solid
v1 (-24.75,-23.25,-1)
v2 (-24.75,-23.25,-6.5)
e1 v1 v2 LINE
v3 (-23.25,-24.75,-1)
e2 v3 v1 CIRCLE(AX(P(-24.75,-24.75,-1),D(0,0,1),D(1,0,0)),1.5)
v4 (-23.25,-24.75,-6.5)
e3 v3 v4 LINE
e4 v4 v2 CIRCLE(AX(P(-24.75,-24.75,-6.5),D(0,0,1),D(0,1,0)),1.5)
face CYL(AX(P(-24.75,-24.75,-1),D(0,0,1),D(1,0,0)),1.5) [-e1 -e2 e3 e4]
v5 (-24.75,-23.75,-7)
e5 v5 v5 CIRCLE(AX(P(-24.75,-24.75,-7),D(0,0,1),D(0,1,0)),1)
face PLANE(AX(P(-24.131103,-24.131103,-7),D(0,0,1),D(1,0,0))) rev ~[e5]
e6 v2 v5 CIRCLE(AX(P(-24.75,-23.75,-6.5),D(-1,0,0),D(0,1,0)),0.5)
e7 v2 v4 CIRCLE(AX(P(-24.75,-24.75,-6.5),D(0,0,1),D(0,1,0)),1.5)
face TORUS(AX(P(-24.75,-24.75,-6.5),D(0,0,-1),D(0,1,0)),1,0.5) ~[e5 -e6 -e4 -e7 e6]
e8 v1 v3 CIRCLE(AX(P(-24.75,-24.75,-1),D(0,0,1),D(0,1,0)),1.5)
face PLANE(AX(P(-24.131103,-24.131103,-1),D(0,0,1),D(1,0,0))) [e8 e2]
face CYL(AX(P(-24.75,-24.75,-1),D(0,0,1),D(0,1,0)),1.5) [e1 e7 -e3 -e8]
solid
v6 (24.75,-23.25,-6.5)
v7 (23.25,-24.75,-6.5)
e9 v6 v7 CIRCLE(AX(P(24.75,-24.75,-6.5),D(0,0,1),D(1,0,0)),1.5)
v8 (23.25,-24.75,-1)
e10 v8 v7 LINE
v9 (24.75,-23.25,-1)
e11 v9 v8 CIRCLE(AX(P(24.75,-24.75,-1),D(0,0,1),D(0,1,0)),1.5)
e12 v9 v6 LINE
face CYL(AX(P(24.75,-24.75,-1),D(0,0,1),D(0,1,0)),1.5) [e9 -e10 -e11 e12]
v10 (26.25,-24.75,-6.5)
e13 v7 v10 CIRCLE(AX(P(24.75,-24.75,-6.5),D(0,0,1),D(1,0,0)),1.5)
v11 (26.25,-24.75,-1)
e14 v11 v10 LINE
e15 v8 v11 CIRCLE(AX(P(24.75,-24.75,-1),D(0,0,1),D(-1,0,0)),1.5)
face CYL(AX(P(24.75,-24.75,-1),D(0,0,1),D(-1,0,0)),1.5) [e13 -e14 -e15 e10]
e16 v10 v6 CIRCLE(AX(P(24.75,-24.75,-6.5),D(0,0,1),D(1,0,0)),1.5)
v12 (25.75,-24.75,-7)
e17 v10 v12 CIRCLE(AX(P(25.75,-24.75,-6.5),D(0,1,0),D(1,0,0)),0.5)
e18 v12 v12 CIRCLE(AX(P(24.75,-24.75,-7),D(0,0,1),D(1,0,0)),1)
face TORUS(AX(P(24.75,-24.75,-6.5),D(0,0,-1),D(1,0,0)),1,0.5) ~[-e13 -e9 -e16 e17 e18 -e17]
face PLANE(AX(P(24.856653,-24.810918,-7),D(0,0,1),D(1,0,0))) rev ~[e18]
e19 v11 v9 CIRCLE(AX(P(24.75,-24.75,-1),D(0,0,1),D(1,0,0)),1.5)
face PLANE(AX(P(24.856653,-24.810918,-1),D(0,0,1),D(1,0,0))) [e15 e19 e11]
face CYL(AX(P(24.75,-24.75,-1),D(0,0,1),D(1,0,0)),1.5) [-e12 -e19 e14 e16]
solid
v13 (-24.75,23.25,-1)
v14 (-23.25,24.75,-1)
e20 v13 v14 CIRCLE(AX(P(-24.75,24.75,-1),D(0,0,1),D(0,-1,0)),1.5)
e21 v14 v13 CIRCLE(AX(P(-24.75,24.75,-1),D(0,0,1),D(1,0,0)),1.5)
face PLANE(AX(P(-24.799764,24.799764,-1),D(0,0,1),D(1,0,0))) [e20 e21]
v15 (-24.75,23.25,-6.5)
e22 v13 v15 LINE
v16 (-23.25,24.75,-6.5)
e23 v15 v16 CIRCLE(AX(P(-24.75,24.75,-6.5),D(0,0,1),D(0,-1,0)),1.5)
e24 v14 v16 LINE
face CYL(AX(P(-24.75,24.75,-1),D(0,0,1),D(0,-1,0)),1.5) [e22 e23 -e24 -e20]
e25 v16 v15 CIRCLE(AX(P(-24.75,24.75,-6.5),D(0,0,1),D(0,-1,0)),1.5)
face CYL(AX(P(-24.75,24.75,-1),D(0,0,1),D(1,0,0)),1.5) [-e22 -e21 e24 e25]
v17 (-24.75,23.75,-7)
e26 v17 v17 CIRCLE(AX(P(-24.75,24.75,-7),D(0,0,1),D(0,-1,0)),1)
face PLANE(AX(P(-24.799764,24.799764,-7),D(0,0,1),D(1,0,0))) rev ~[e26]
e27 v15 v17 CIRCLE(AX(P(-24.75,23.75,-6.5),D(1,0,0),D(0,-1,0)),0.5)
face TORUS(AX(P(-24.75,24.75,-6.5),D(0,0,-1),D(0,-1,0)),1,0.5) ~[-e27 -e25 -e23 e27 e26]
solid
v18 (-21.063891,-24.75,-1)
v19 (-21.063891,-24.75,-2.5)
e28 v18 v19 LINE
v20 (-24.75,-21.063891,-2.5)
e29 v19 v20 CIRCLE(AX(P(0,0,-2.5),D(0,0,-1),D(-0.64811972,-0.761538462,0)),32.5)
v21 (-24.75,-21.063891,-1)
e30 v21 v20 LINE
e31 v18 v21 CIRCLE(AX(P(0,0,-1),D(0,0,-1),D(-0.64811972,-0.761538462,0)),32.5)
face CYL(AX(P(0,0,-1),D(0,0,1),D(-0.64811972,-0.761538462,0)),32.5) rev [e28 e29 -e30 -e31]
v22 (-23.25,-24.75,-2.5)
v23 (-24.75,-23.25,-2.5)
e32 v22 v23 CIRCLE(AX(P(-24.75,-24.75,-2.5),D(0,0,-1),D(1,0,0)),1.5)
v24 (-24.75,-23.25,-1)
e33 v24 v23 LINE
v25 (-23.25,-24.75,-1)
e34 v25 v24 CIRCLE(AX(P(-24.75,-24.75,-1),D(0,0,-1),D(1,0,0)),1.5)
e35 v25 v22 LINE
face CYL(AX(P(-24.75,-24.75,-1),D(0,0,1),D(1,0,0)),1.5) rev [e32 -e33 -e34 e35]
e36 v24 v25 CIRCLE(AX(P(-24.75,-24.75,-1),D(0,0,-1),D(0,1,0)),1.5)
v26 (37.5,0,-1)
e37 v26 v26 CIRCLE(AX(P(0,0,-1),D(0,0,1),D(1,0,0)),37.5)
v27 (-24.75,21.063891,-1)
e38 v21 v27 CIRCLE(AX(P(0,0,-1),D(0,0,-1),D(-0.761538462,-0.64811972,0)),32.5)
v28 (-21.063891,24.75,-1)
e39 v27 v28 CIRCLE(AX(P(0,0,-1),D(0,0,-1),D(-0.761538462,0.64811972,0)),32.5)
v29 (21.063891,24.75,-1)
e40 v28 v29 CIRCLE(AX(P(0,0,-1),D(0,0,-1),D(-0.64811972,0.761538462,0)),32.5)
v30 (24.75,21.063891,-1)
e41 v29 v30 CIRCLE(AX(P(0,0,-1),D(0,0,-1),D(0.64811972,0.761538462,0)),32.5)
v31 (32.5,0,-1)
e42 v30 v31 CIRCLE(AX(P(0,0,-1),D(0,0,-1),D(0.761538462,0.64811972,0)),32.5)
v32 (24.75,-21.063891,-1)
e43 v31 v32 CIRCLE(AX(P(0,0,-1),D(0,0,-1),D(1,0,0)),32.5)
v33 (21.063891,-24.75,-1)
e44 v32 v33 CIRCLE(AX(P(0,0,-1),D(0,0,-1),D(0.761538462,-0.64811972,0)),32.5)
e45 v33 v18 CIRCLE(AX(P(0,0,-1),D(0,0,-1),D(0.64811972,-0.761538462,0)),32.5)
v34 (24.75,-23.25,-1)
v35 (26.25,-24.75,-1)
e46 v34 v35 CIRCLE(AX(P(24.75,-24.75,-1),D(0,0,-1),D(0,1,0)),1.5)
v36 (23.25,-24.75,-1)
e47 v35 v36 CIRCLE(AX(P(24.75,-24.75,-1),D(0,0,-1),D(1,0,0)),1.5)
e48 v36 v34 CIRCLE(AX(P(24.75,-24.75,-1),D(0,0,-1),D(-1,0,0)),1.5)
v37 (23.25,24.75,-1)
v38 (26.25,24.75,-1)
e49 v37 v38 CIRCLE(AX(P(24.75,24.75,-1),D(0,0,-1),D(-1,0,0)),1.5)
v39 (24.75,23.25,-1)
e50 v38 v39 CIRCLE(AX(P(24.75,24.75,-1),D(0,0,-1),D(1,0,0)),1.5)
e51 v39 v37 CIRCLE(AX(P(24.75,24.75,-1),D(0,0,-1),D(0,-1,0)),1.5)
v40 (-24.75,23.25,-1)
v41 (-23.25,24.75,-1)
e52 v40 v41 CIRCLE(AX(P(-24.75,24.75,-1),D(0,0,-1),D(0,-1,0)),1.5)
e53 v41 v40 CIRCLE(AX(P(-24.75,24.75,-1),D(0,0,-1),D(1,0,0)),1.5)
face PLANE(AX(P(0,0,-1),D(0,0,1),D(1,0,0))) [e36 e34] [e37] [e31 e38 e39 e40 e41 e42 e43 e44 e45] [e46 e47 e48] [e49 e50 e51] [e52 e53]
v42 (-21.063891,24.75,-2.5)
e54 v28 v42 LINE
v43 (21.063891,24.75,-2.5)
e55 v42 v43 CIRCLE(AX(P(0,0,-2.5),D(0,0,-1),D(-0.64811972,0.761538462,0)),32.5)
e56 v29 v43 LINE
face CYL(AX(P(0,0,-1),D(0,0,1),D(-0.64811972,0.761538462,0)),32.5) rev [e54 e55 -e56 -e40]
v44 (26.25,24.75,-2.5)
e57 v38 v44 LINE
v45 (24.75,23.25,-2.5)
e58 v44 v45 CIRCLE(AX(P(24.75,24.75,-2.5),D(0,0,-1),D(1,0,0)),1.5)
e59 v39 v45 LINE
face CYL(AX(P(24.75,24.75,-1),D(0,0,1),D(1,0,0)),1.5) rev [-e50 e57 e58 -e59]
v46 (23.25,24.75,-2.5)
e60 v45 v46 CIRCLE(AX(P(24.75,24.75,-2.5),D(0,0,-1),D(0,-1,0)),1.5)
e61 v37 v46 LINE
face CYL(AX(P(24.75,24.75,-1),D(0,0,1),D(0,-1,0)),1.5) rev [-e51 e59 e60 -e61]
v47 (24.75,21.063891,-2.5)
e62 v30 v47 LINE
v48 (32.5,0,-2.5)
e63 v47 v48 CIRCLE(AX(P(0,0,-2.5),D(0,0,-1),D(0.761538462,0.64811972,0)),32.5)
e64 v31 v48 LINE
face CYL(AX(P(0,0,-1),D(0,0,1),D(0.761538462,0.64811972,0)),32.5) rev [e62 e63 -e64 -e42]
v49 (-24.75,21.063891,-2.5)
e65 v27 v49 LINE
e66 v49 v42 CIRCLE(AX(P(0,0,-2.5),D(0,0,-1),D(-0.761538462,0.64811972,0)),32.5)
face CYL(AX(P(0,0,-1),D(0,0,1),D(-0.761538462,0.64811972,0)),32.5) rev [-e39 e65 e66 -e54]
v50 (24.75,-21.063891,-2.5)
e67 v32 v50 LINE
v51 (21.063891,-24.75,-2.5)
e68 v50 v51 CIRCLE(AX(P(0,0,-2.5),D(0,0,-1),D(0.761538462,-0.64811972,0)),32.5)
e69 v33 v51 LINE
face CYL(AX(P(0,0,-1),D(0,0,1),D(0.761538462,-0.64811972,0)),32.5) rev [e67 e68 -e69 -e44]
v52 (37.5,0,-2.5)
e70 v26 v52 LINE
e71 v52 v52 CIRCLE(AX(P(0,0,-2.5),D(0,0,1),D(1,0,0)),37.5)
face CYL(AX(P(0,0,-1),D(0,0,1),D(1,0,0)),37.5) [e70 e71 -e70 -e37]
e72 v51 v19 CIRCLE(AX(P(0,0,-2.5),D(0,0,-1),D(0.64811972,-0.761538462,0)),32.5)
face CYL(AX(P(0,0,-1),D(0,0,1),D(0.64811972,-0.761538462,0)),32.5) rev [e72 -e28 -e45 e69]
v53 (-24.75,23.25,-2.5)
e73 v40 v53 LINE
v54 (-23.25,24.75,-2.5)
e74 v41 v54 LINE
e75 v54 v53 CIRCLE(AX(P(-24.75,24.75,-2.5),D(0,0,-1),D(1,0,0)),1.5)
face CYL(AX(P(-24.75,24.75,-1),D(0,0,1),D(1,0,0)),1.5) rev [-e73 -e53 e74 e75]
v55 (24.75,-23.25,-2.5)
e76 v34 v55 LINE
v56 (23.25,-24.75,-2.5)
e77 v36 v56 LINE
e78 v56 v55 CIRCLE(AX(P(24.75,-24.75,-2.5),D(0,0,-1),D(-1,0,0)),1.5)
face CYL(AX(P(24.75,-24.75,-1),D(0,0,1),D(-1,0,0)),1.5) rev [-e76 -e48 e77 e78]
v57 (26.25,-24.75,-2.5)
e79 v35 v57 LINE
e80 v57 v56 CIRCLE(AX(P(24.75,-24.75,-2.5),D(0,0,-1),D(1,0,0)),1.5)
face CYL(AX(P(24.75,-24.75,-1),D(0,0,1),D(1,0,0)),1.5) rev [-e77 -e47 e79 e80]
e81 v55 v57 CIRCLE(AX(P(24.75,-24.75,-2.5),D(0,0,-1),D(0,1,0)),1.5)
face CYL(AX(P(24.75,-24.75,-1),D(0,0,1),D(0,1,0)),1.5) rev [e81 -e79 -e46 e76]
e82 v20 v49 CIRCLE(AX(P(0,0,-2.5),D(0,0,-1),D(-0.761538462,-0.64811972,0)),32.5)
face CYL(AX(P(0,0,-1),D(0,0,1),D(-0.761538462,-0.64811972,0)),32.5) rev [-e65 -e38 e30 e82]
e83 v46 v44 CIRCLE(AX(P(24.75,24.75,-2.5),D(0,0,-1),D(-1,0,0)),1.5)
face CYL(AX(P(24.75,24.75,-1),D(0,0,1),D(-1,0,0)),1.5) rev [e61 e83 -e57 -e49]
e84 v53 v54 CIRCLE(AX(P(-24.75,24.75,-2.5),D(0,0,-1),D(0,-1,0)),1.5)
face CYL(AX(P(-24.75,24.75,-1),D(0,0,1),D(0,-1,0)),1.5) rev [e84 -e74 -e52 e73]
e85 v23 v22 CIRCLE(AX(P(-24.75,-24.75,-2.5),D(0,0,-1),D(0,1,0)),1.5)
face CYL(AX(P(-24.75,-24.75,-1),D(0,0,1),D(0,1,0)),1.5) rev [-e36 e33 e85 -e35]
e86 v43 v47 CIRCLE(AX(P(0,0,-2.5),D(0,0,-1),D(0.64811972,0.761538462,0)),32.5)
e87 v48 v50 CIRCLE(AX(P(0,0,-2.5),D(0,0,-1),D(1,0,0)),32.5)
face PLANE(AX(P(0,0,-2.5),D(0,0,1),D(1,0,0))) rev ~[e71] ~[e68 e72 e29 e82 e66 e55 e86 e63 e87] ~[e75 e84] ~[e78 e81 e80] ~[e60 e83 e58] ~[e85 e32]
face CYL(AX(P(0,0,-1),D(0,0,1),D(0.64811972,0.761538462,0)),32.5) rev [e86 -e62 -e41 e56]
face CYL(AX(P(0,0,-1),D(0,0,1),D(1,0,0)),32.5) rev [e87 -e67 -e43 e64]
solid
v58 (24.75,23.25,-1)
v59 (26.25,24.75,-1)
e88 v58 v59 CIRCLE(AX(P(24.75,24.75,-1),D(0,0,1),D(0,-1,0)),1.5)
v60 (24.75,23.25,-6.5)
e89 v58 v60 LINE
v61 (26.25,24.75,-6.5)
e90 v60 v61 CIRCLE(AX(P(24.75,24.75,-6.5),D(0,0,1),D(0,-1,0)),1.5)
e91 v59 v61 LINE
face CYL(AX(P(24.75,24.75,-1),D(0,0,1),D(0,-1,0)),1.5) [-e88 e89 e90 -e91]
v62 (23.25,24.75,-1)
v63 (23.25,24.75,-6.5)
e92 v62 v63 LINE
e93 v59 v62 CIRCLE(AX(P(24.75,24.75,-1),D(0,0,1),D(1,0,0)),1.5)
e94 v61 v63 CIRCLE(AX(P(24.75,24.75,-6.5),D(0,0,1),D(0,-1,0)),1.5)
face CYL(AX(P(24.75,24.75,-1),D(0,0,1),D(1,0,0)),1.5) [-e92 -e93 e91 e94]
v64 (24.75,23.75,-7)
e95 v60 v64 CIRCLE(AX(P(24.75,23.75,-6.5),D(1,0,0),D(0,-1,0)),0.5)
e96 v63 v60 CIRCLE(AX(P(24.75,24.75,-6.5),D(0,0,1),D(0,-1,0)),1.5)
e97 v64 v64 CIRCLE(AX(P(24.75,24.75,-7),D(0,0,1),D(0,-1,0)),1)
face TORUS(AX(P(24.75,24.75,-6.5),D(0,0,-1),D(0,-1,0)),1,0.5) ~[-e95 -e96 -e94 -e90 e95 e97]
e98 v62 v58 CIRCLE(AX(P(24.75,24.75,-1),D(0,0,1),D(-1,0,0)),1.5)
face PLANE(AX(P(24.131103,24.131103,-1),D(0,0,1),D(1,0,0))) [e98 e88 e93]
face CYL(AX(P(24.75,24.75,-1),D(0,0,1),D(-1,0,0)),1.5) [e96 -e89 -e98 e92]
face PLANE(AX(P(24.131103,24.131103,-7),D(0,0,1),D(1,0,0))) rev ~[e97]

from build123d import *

# Parameters (mm, degrees)
F2_DEPTH = 6
F1_R     = 37.5
F4_DEPTH = 1.5


# Not quite as in the source:
# - a fillet or chamfer that OpenCascade refuses, or shapes differently, is made with other operations: its cross-section is extruded or revolved along the edge and cut away or added


with BuildPart() as f2:
    # F1 (on offset) → F2 (new body)
    with BuildSketch(Plane.XY.offset(-1)):
        with BuildLine():
            Line((-24.75, 24.75), (-23.25, 24.75))
            ThreePointArc((-23.25, 24.75), (-25.8106601718, 25.8106601718), (-24.75, 23.25))
            Line((-24.75, 23.25), (-24.75, 24.75))
        make_face()
        with BuildLine():
            ThreePointArc((-24.75, 23.25), (-23.6893398282, 23.6893398282), (-23.25, 24.75))
            Line((-23.25, 24.75), (-24.75, 24.75))
            Line((-24.75, 24.75), (-24.75, 23.25))
        make_face()
    extrude(amount=-F2_DEPTH)

    # F3: fillet of radius 0.5 on 1 edges, made by hand

    # F3_s1 → F3_t2 (revolve, cut)
    with BuildSketch(Plane.YZ.offset(-24.75)):
        with BuildLine():
            ThreePointArc((23.25, -6.5), (23.3964466094, -6.8535533906), (23.75, -7))
            Line((23.75, -7), (23.25, -7))
            Line((23.25, -7), (23.25, -6.5))
        make_face()
    revolve(axis=Axis((-24.75, 24.75, -7), (0, 0, 1)), mode=Mode.SUBTRACT)


with BuildPart() as f2b:
    # F1 (on offset) → F2, piece 2 (new body)
    with BuildSketch(Plane.XY.offset(-1)):
        with BuildLine():
            ThreePointArc((23.25, 24.75), (23.6893398282, 23.6893398282), (24.75, 23.25))
            Line((24.75, 23.25), (24.75, 24.75))
            Line((24.75, 24.75), (23.25, 24.75))
        make_face()
        with BuildLine():
            Line((24.75, 24.75), (24.75, 23.25))
            ThreePointArc((24.75, 23.25), (25.8106601718, 23.6893398282), (26.25, 24.75))
            ThreePointArc((26.25, 24.75), (24.75, 26.25), (23.25, 24.75))
            Line((23.25, 24.75), (24.75, 24.75))
        make_face()
    extrude(amount=-F2_DEPTH)

    # F3#2: fillet of radius 0.5 on 1 edges, made by hand

    # F3_2_s1 → F3_2_t2 (revolve, cut)
    with BuildSketch(Plane.YZ.offset(24.75)):
        with BuildLine():
            ThreePointArc((23.25, -6.5), (23.3964466094, -6.8535533906), (23.75, -7))
            Line((23.75, -7), (23.25, -7))
            Line((23.25, -7), (23.25, -6.5))
        make_face()
    revolve(axis=Axis((24.75, 24.75, -7), (0, 0, 1)), mode=Mode.SUBTRACT)


with BuildPart() as f2c:
    # F1 (on offset) → F2, piece 3 (new body)
    with BuildSketch(Plane.XY.offset(-1)):
        with BuildLine():
            ThreePointArc((26.25, -24.75), (25.8106601718, -23.6893398282), (24.75, -23.25))
            Line((24.75, -23.25), (24.75, -24.75))
            Line((24.75, -24.75), (23.25, -24.75))
            ThreePointArc((23.25, -24.75), (24.75, -26.25), (26.25, -24.75))
        make_face()
        with BuildLine():
            Line((24.75, -24.75), (24.75, -23.25))
            ThreePointArc((24.75, -23.25), (23.6893398282, -23.6893398282), (23.25, -24.75))
            Line((23.25, -24.75), (24.75, -24.75))
        make_face()
    extrude(amount=-F2_DEPTH)

    # F3#3: fillet of radius 0.5 on 1 edges, made by hand

    # F3_3_s1 → F3_3_t2 (revolve, cut)
    with BuildSketch(Plane.XZ.offset(24.75)):
        with BuildLine():
            ThreePointArc((26.25, -6.5), (26.1035533906, -6.8535533906), (25.75, -7))
            Line((25.75, -7), (26.25, -7))
            Line((26.25, -7), (26.25, -6.5))
        make_face()
    revolve(axis=Axis((24.75, -24.75, -7), (0, 0, 1)), mode=Mode.SUBTRACT)


with BuildPart() as f2d:
    # F1 (on offset) → F2, piece 4 (new body)
    with BuildSketch(Plane.XY.offset(-1)):
        with BuildLine():
            Line((-24.75, -24.75), (-23.25, -24.75))
            ThreePointArc((-23.25, -24.75), (-23.6893398282, -23.6893398282), (-24.75, -23.25))
            Line((-24.75, -23.25), (-24.75, -24.75))
        make_face()
        with BuildLine():
            ThreePointArc((-24.75, -23.25), (-25.8106601718, -25.8106601718), (-23.25, -24.75))
            Line((-23.25, -24.75), (-24.75, -24.75))
            Line((-24.75, -24.75), (-24.75, -23.25))
        make_face()
    extrude(amount=-F2_DEPTH)

    # F3#4: fillet of radius 0.5 on 1 edges, made by hand

    # F3_4_s1 → F3_4_t2 (revolve, cut)
    with BuildSketch(Plane.YZ.offset(-24.75)):
        with BuildLine():
            ThreePointArc((-23.25, -6.5), (-23.3964466094, -6.8535533906), (-23.75, -7))
            Line((-23.75, -7), (-23.25, -7))
            Line((-23.25, -7), (-23.25, -6.5))
        make_face()
    revolve(axis=Axis((-24.75, -24.75, -7), (0, 0, 1)), mode=Mode.SUBTRACT)


with BuildPart() as f4:
    # F1 (on offset) → F4 (new body)
    with BuildSketch(Plane.XY.offset(-1)):
        Circle(F1_R)
        with BuildLine():
            ThreePointArc((24.75, 21.0638909036), (30.501024573, 11.2221878437), (32.5, 0))
            ThreePointArc((32.5, 0), (30.501024573, -11.2221878437), (24.75, -21.0638909036))
            Line((24.75, -21.0638909036), (24.75, -23.25))
            ThreePointArc((24.75, -23.25), (25.8106601718, -23.6893398282), (26.25, -24.75))
            ThreePointArc((26.25, -24.75), (24.75, -26.25), (23.25, -24.75))
            Line((23.25, -24.75), (21.0638909036, -24.75))
            ThreePointArc((21.0638909036, -24.75), (0, -32.5), (-21.0638909036, -24.75))
            Line((-21.0638909036, -24.75), (-23.25, -24.75))
            ThreePointArc((-23.25, -24.75), (-25.8106601718, -25.8106601718), (-24.75, -23.25))
            Line((-24.75, -23.25), (-24.75, -21.0638909036))
            ThreePointArc((-24.75, -21.0638909036), (-32.5, 0), (-24.75, 21.0638909036))
            Line((-24.75, 21.0638909036), (-24.75, 23.25))
            ThreePointArc((-24.75, 23.25), (-25.8106601718, 25.8106601718), (-23.25, 24.75))
            Line((-23.25, 24.75), (-21.0638909036, 24.75))
            ThreePointArc((-21.0638909036, 24.75), (0, 32.5), (21.0638909036, 24.75))
            Line((21.0638909036, 24.75), (23.25, 24.75))
            ThreePointArc((23.25, 24.75), (24.75, 26.25), (26.25, 24.75))
            ThreePointArc((26.25, 24.75), (25.8106601718, 23.6893398282), (24.75, 23.25))
            Line((24.75, 23.25), (24.75, 21.0638909036))
        make_face(mode=Mode.SUBTRACT)
        with BuildLine():
            Line((-23.25, -24.75), (-21.0638909036, -24.75))
            ThreePointArc((-21.0638909036, -24.75), (-22.9809703886, -22.9809703886), (-24.75, -21.0638909036))
            Line((-24.75, -21.0638909036), (-24.75, -23.25))
            ThreePointArc((-24.75, -23.25), (-23.6893398282, -23.6893398282), (-23.25, -24.75))
        make_face()
        with BuildLine():
            ThreePointArc((-24.75, 21.0638909036), (-22.9809703886, 22.9809703886), (-21.0638909036, 24.75))
            Line((-21.0638909036, 24.75), (-23.25, 24.75))
            ThreePointArc((-23.25, 24.75), (-23.6893398282, 23.6893398282), (-24.75, 23.25))
            Line((-24.75, 23.25), (-24.75, 21.0638909036))
        make_face()
        with BuildLine():
            ThreePointArc((21.0638909036, 24.75), (22.9809703886, 22.9809703886), (24.75, 21.0638909036))
            Line((24.75, 21.0638909036), (24.75, 23.25))
            ThreePointArc((24.75, 23.25), (23.6893398282, 23.6893398282), (23.25, 24.75))
            Line((23.25, 24.75), (21.0638909036, 24.75))
        make_face()
        with BuildLine():
            Line((24.75, -23.25), (24.75, -21.0638909036))
            ThreePointArc((24.75, -21.0638909036), (22.9809703886, -22.9809703886), (21.0638909036, -24.75))
            Line((21.0638909036, -24.75), (23.25, -24.75))
            ThreePointArc((23.25, -24.75), (23.6893398282, -23.6893398282), (24.75, -23.25))
        make_face()
    extrude(amount=-F4_DEPTH)


solid = Compound([f2.part, f2b.part, f2c.part, f2d.part, f4.part])
